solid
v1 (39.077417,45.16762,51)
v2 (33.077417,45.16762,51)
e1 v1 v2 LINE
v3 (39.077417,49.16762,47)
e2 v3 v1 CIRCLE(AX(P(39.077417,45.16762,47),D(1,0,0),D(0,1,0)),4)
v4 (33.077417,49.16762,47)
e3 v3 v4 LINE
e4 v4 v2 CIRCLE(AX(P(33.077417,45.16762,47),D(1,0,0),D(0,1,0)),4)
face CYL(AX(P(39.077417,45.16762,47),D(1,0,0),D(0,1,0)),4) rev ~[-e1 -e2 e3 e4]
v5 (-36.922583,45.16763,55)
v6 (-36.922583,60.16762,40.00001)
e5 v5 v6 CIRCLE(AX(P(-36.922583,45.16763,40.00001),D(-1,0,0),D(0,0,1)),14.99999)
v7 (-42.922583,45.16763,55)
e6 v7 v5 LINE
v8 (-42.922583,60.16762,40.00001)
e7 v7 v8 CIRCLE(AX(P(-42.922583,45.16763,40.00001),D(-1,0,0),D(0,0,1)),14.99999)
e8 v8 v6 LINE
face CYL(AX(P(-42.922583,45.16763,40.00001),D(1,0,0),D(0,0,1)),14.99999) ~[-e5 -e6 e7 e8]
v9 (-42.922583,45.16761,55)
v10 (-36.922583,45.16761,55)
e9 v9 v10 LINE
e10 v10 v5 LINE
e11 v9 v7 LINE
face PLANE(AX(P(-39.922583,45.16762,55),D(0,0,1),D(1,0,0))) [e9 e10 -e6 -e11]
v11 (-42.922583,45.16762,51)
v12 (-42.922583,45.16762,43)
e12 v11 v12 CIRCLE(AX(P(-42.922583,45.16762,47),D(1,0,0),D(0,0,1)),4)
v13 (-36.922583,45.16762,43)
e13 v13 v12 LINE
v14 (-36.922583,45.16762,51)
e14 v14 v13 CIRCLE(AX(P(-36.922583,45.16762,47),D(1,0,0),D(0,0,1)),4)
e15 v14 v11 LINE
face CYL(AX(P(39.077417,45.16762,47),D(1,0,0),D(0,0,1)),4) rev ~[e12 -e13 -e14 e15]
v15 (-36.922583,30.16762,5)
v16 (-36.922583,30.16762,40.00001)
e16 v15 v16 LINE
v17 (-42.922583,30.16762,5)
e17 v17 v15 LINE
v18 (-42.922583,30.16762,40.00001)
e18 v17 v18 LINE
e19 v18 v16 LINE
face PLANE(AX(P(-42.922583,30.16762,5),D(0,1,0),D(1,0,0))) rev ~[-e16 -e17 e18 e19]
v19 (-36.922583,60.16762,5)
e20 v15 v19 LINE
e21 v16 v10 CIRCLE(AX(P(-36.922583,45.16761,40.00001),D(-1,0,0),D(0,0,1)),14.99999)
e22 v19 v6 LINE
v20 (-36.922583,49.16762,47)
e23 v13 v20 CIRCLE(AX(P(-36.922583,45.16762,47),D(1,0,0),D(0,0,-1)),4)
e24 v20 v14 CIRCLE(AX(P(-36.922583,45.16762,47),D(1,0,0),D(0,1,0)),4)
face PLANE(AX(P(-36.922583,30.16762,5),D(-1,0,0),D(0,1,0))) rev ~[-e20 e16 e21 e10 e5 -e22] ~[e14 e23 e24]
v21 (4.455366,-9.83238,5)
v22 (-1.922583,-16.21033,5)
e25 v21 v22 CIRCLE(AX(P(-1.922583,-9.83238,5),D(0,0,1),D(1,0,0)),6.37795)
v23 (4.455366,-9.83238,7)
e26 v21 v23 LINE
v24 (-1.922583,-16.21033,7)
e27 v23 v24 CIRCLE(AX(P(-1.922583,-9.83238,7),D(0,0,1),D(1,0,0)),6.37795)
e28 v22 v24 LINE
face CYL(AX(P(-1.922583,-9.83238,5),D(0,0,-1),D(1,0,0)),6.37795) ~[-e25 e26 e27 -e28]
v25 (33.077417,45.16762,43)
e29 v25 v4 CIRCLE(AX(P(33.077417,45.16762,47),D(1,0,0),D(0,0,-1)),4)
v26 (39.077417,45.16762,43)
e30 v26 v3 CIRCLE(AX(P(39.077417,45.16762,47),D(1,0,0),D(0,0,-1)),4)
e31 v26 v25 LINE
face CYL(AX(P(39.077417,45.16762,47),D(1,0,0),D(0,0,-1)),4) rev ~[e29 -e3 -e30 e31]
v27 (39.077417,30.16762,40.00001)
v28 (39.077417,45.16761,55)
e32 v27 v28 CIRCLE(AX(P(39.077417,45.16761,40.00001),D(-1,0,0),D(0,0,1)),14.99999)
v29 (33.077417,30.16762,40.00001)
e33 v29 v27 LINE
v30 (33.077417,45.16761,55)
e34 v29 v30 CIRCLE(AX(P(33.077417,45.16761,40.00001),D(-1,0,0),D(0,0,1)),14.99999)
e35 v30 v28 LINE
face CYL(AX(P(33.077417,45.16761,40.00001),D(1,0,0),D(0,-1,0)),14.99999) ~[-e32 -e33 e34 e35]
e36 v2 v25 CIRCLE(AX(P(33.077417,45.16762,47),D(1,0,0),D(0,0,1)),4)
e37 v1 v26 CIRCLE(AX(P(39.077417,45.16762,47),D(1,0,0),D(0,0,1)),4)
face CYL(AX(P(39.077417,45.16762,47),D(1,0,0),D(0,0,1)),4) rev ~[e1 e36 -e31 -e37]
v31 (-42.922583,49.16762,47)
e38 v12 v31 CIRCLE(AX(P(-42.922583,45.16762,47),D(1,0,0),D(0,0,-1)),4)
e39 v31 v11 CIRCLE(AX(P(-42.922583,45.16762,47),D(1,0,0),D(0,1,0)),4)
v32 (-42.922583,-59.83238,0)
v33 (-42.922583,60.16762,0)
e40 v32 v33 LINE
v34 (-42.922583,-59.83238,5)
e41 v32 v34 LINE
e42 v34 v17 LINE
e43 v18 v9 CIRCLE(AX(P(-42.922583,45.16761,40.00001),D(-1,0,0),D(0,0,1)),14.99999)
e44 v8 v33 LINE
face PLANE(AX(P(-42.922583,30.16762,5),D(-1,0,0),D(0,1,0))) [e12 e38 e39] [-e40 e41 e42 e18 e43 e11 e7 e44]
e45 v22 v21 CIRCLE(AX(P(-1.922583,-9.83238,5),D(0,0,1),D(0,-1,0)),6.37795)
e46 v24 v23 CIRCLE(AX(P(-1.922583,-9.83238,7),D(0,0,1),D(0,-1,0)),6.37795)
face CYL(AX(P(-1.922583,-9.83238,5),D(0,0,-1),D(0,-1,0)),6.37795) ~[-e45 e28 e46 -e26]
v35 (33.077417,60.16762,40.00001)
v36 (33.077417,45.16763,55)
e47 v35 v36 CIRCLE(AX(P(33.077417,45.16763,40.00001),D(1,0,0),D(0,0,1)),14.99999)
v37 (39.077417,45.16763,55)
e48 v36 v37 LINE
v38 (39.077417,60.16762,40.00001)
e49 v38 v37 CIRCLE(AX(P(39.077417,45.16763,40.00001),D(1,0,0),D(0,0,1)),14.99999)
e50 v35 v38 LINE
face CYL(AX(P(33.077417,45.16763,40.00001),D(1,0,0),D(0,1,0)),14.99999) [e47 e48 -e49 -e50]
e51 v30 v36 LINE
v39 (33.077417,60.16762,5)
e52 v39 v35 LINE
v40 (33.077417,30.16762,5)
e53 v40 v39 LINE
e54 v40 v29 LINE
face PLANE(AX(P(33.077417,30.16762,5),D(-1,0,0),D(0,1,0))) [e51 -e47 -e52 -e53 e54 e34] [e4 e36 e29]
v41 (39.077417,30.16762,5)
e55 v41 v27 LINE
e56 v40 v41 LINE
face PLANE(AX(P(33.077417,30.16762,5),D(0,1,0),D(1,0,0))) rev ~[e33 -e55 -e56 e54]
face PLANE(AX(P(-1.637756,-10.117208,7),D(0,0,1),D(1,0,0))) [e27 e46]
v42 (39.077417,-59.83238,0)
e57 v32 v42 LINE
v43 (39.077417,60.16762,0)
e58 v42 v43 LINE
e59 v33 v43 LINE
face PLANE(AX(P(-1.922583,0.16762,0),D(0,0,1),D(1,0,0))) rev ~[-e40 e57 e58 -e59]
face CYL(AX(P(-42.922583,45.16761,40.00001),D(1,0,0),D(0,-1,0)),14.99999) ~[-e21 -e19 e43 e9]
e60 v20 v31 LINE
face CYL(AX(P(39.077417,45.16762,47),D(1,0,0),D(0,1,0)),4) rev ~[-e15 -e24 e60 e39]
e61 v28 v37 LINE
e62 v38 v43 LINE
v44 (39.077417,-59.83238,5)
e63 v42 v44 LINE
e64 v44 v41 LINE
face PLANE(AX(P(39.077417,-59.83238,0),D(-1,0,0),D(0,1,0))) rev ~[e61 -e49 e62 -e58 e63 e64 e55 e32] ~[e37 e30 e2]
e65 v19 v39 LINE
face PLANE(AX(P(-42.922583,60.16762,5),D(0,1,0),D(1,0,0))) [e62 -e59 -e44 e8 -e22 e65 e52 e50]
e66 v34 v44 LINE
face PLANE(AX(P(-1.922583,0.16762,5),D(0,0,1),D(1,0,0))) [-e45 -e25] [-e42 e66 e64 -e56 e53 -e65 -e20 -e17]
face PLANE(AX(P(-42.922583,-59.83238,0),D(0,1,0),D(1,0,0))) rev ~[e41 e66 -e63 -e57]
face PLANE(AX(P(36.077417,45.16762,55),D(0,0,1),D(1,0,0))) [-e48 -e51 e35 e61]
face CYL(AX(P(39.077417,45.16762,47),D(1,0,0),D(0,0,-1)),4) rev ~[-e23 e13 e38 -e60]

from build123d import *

# Parameters (mm, degrees)
F0_W     = 82
F0_H     = 120
F1_DEPTH = 5
F3_DEPTH = 2
F4_W     = 6
F4_H     = 30
F5_DEPTH = 50
F7_DEPTH = 82.001
F8_R     = 14.99999


# Not quite as in the source:
# - a fillet or chamfer is up to 0.001 mm smaller than in the source, because OpenCascade refuses the exact size


with BuildPart() as f1:
    # F0 (on Top) → F1 (new body)
    with BuildSketch(Plane.XY):
        with Locations((-1.9225833714, 0.167620076)):
            Rectangle(F0_W, F0_H)
    extrude(amount=F1_DEPTH)

    # F2 (on face) → F3 (join)
    with BuildSketch(Plane.XY.offset(5)):
        with BuildLine():
            ThreePointArc((-1.9225833714, -16.2103295776), (2.5873080787, -14.3422713741), (4.4553662822, -9.832379924))
            ThreePointArc((4.4553662822, -9.832379924), (-6.4324748215, -5.3224884739), (-1.9225833714, -16.2103295776))
        make_face()
    extrude(amount=F3_DEPTH)

    # F4 (on face) → F5 (join)
    with BuildSketch(Plane.XY.offset(5)):
        with Locations((-39.9225833714, 45.167620076)):
            Rectangle(F4_W, F4_H)
        with Locations((36.0774166286, 45.167620076)):
            Rectangle(F4_W, F4_H)
    extrude(amount=F5_DEPTH)

    # F6 (on face) → F7 (cut, through all)
    with BuildSketch(Plane.YZ.offset(39.0774166286)):
        with BuildLine():
            Line((45.167620076, 43), (45.167620076, 51))
            ThreePointArc((45.167620076, 51), (41.167620076, 47), (45.167620076, 43))
        make_face()
        with BuildLine():
            ThreePointArc((45.167620076, 43), (47.9960472007, 44.1715728753), (49.167620076, 47))
            ThreePointArc((49.167620076, 47), (47.9960472007, 49.8284271247), (45.167620076, 51))
            Line((45.167620076, 51), (45.167620076, 43))
        make_face()
    extrude(amount=-F7_DEPTH, mode=Mode.SUBTRACT)

    # F8 (radius 15 in the source; OpenCascade refuses exactly that, so slightly less here)
    f8_edges = [f1.edges().sort_by_distance(p)[0] for p in [
        (36.077417, 30.16762, 55),
        (-39.922583, 30.16762, 55),
        (-39.922583, 60.16762, 55),
        (36.077417, 60.16762, 55),
    ]]
    fillet(f8_edges, radius=F8_R)


solid = f1.part
